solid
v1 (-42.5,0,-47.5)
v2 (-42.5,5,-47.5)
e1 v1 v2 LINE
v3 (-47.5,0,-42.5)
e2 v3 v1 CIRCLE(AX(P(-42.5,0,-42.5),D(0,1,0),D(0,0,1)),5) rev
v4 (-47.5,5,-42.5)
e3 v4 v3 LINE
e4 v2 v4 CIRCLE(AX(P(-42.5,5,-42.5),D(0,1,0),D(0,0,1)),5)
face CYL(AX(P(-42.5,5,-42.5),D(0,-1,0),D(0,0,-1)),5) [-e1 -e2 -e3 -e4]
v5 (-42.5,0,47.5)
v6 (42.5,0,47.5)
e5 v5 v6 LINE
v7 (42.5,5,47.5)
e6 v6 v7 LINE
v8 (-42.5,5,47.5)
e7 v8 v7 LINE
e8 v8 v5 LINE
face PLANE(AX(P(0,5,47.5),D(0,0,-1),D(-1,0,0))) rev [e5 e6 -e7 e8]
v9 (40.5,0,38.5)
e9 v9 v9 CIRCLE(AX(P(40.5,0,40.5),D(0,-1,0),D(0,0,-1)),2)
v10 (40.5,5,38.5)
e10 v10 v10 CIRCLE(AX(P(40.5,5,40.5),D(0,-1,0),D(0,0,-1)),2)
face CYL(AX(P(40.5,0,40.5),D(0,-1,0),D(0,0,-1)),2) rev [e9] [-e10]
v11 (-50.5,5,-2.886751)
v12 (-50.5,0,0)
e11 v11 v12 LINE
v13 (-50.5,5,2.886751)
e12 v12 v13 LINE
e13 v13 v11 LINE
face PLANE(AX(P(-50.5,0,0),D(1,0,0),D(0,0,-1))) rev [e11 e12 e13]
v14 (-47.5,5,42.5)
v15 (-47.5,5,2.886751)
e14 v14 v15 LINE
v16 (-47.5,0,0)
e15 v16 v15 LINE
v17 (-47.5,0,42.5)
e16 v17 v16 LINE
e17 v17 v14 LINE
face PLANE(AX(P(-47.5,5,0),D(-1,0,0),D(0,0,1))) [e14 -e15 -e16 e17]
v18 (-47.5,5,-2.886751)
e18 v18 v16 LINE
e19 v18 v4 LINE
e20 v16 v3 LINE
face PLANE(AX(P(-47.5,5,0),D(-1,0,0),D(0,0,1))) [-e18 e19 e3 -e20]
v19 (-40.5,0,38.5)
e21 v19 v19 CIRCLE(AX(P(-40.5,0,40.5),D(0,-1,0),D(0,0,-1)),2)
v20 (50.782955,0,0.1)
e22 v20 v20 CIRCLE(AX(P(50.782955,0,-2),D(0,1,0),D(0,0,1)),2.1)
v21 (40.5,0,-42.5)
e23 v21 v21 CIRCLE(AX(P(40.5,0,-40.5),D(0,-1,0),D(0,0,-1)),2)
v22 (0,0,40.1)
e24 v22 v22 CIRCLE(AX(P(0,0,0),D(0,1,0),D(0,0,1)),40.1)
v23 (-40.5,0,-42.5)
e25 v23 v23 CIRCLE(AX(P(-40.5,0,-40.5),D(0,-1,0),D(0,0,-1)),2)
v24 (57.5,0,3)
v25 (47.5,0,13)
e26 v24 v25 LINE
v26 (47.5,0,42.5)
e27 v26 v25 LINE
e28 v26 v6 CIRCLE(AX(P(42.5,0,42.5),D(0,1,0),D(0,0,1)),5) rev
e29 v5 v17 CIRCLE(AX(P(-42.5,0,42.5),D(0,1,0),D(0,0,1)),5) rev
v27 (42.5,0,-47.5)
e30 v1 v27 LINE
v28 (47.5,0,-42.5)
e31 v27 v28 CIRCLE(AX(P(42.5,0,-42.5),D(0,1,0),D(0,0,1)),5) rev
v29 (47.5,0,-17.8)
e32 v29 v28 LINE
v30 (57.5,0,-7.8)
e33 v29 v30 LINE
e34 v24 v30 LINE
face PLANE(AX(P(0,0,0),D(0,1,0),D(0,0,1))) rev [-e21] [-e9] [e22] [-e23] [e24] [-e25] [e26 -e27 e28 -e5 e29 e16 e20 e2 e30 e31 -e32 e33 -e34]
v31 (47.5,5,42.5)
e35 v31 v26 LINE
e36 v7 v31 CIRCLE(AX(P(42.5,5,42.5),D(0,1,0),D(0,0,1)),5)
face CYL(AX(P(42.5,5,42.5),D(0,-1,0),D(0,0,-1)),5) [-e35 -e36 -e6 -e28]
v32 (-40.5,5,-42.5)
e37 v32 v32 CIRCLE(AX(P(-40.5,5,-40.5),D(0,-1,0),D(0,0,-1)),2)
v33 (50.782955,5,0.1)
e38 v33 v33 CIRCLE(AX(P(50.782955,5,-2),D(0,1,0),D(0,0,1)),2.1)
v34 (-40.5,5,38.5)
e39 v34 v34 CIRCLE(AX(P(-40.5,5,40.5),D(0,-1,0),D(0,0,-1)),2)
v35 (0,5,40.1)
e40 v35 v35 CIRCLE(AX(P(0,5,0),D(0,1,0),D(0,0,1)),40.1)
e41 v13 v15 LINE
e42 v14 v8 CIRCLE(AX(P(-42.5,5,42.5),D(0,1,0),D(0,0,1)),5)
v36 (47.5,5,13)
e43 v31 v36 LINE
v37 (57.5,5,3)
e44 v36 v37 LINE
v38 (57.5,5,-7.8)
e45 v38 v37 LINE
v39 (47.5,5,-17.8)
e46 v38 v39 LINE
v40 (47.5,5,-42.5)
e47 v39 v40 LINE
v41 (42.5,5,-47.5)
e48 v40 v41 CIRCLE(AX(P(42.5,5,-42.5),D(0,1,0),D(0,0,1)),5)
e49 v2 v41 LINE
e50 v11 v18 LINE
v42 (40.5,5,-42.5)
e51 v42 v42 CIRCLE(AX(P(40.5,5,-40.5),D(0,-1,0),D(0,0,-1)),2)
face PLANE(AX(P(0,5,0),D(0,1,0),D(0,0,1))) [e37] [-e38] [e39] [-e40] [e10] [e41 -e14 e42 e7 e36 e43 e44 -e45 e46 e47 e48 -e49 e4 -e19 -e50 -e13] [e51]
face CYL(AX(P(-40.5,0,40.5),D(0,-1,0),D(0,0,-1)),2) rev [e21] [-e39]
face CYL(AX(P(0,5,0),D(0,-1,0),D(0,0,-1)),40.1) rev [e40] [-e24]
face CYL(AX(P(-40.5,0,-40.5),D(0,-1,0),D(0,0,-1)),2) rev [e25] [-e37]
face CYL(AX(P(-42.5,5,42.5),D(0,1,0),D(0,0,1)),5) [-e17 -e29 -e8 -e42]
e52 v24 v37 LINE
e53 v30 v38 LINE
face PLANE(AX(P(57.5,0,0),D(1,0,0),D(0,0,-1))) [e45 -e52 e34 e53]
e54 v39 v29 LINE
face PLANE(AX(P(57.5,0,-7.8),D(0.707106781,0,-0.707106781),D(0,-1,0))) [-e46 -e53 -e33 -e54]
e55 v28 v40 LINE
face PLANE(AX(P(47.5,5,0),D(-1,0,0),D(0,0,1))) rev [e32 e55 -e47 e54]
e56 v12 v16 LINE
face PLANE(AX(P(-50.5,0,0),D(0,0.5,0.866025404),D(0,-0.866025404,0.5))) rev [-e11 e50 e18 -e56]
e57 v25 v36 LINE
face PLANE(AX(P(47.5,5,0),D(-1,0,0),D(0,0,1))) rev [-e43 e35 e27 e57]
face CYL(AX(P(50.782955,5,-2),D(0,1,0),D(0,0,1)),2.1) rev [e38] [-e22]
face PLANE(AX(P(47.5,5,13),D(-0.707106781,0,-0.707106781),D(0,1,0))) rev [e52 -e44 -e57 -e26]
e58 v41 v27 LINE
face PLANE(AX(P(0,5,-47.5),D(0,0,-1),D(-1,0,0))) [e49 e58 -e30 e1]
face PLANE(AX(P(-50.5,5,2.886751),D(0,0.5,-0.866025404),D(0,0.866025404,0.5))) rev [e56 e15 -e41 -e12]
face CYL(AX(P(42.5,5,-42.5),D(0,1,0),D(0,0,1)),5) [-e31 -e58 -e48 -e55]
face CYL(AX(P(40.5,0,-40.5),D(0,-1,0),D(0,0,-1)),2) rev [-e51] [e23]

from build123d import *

# Parameters (mm, degrees)
SKETCH1_W                       = 95
SKETCH1_H                       = 95
SKETCH1_W_2                     = 81
SKETCH1_H_2                     = 81
SKETCH1_R                       = 40.1
BOSS_EXTRUDE1_DEPTH             = 5
F_4_0MM_DOWEL_HOLE1_D           = 4
BOSS_EXTRUDE2_DEPTH             = 3
FILLET1_R                       = 5
SKETCH6_W                       = 3
SKETCH6_H                       = 5
SKETCH6_W_2                     = 4.8
BOSS_EXTRUDE3_DEPTH             = 10
TAP_DRILL_FOR_M5X0_8_TAP1_D     = 4.2
TAP_DRILL_FOR_M5X0_8_TAP1_DEPTH = 12
TAP_DRILL_FOR_M5X0_8_TAP1_TIP   = 1.2618073
CHAMFER1_SIZE                   = 10


with BuildPart() as part:
    # Sketch1 → Boss-Extrude1 (new body)
    # profile 1 of 2: a face of its own
    with BuildSketch(Plane(origin=(0, 0, 0), x_dir=(1, 0, 0), z_dir=(0, 1, 0))):
        Rectangle(SKETCH1_W, SKETCH1_H)
        Rectangle(SKETCH1_W_2, SKETCH1_H_2, mode=Mode.SUBTRACT)
    # profile 2 of 2: a face of its own
    with BuildSketch(Plane(origin=(0, 0, 0), x_dir=(1, 0, 0), z_dir=(0, 1, 0))):
        Rectangle(SKETCH1_W_2, SKETCH1_H_2)
        with Locations(Location((0, 0, 0), (0, 0, 270))):
            Circle(SKETCH1_R, mode=Mode.SUBTRACT)
    extrude(amount=BOSS_EXTRUDE1_DEPTH)

    # Ø4.0mm Dowel Hole1 (through all)
    with Locations(Plane(origin=(0, 0, 0), x_dir=(-1, 0, 0), z_dir=(0, -1, 0))):
        with Locations((40.5, -40.5), (-40.5, -40.5), (-40.5, 40.5), (40.5, 40.5)):
            Hole(F_4_0MM_DOWEL_HOLE1_D / 2)

    # Sketch5 → Boss-Extrude2 (add)
    with BuildSketch(Plane.ZY.offset(47.5)):
        Polygon((0, 0), (-2.886751346, 5), (2.886751346, 5), align=None)
    extrude(amount=BOSS_EXTRUDE2_DEPTH)

    # Fillet1
    fillet1_edges = [part.edges().sort_by_distance(p)[0] for p in [
        (-47.5, 2.5, 47.5),
        (-47.5, 2.5, -47.5),
        (47.5, 2.5, -47.5),
        (47.5, 2.5, 47.5),
    ]]
    fillet(fillet1_edges, radius=FILLET1_R)

    # Sketch6 → Boss-Extrude3 (add)
    with BuildSketch(Plane(origin=(47.5, 0, 0), x_dir=(0, 0, -1), z_dir=(1, 0, 0))):
        with Locations((-1.5, 2.5)):
            Rectangle(SKETCH6_W, SKETCH6_H)
        with Locations((2.4, 2.5)):
            Rectangle(SKETCH6_W_2, SKETCH6_H)
        with Locations((6.3, 2.5)):
            Rectangle(SKETCH6_W, SKETCH6_H)
    extrude(amount=BOSS_EXTRUDE3_DEPTH)

    # Tap Drill for M5x0.8 Tap1
    with Locations(Plane(origin=(0, 5, 0), x_dir=(1, 0, 0), z_dir=(0, 1, 0))):
        with Locations((50.782954503, 2)):
            Hole(TAP_DRILL_FOR_M5X0_8_TAP1_D / 2, depth=TAP_DRILL_FOR_M5X0_8_TAP1_DEPTH)
            with Locations((0, 0, -(TAP_DRILL_FOR_M5X0_8_TAP1_DEPTH + TAP_DRILL_FOR_M5X0_8_TAP1_TIP / 2))):  # 118° drill point
                Cone(0, TAP_DRILL_FOR_M5X0_8_TAP1_D / 2, TAP_DRILL_FOR_M5X0_8_TAP1_TIP, mode=Mode.SUBTRACT)

    # Chamfer1
    chamfer1_edges = [part.edges().sort_by_distance(p)[0] for p in [
        (47.5, 2.5, 3),
        (47.5, 2.5, -7.8),
    ]]
    chamfer(chamfer1_edges, length=CHAMFER1_SIZE - 0.0001)  # a hair under: the kernel refuses the full size


solid = part.part
